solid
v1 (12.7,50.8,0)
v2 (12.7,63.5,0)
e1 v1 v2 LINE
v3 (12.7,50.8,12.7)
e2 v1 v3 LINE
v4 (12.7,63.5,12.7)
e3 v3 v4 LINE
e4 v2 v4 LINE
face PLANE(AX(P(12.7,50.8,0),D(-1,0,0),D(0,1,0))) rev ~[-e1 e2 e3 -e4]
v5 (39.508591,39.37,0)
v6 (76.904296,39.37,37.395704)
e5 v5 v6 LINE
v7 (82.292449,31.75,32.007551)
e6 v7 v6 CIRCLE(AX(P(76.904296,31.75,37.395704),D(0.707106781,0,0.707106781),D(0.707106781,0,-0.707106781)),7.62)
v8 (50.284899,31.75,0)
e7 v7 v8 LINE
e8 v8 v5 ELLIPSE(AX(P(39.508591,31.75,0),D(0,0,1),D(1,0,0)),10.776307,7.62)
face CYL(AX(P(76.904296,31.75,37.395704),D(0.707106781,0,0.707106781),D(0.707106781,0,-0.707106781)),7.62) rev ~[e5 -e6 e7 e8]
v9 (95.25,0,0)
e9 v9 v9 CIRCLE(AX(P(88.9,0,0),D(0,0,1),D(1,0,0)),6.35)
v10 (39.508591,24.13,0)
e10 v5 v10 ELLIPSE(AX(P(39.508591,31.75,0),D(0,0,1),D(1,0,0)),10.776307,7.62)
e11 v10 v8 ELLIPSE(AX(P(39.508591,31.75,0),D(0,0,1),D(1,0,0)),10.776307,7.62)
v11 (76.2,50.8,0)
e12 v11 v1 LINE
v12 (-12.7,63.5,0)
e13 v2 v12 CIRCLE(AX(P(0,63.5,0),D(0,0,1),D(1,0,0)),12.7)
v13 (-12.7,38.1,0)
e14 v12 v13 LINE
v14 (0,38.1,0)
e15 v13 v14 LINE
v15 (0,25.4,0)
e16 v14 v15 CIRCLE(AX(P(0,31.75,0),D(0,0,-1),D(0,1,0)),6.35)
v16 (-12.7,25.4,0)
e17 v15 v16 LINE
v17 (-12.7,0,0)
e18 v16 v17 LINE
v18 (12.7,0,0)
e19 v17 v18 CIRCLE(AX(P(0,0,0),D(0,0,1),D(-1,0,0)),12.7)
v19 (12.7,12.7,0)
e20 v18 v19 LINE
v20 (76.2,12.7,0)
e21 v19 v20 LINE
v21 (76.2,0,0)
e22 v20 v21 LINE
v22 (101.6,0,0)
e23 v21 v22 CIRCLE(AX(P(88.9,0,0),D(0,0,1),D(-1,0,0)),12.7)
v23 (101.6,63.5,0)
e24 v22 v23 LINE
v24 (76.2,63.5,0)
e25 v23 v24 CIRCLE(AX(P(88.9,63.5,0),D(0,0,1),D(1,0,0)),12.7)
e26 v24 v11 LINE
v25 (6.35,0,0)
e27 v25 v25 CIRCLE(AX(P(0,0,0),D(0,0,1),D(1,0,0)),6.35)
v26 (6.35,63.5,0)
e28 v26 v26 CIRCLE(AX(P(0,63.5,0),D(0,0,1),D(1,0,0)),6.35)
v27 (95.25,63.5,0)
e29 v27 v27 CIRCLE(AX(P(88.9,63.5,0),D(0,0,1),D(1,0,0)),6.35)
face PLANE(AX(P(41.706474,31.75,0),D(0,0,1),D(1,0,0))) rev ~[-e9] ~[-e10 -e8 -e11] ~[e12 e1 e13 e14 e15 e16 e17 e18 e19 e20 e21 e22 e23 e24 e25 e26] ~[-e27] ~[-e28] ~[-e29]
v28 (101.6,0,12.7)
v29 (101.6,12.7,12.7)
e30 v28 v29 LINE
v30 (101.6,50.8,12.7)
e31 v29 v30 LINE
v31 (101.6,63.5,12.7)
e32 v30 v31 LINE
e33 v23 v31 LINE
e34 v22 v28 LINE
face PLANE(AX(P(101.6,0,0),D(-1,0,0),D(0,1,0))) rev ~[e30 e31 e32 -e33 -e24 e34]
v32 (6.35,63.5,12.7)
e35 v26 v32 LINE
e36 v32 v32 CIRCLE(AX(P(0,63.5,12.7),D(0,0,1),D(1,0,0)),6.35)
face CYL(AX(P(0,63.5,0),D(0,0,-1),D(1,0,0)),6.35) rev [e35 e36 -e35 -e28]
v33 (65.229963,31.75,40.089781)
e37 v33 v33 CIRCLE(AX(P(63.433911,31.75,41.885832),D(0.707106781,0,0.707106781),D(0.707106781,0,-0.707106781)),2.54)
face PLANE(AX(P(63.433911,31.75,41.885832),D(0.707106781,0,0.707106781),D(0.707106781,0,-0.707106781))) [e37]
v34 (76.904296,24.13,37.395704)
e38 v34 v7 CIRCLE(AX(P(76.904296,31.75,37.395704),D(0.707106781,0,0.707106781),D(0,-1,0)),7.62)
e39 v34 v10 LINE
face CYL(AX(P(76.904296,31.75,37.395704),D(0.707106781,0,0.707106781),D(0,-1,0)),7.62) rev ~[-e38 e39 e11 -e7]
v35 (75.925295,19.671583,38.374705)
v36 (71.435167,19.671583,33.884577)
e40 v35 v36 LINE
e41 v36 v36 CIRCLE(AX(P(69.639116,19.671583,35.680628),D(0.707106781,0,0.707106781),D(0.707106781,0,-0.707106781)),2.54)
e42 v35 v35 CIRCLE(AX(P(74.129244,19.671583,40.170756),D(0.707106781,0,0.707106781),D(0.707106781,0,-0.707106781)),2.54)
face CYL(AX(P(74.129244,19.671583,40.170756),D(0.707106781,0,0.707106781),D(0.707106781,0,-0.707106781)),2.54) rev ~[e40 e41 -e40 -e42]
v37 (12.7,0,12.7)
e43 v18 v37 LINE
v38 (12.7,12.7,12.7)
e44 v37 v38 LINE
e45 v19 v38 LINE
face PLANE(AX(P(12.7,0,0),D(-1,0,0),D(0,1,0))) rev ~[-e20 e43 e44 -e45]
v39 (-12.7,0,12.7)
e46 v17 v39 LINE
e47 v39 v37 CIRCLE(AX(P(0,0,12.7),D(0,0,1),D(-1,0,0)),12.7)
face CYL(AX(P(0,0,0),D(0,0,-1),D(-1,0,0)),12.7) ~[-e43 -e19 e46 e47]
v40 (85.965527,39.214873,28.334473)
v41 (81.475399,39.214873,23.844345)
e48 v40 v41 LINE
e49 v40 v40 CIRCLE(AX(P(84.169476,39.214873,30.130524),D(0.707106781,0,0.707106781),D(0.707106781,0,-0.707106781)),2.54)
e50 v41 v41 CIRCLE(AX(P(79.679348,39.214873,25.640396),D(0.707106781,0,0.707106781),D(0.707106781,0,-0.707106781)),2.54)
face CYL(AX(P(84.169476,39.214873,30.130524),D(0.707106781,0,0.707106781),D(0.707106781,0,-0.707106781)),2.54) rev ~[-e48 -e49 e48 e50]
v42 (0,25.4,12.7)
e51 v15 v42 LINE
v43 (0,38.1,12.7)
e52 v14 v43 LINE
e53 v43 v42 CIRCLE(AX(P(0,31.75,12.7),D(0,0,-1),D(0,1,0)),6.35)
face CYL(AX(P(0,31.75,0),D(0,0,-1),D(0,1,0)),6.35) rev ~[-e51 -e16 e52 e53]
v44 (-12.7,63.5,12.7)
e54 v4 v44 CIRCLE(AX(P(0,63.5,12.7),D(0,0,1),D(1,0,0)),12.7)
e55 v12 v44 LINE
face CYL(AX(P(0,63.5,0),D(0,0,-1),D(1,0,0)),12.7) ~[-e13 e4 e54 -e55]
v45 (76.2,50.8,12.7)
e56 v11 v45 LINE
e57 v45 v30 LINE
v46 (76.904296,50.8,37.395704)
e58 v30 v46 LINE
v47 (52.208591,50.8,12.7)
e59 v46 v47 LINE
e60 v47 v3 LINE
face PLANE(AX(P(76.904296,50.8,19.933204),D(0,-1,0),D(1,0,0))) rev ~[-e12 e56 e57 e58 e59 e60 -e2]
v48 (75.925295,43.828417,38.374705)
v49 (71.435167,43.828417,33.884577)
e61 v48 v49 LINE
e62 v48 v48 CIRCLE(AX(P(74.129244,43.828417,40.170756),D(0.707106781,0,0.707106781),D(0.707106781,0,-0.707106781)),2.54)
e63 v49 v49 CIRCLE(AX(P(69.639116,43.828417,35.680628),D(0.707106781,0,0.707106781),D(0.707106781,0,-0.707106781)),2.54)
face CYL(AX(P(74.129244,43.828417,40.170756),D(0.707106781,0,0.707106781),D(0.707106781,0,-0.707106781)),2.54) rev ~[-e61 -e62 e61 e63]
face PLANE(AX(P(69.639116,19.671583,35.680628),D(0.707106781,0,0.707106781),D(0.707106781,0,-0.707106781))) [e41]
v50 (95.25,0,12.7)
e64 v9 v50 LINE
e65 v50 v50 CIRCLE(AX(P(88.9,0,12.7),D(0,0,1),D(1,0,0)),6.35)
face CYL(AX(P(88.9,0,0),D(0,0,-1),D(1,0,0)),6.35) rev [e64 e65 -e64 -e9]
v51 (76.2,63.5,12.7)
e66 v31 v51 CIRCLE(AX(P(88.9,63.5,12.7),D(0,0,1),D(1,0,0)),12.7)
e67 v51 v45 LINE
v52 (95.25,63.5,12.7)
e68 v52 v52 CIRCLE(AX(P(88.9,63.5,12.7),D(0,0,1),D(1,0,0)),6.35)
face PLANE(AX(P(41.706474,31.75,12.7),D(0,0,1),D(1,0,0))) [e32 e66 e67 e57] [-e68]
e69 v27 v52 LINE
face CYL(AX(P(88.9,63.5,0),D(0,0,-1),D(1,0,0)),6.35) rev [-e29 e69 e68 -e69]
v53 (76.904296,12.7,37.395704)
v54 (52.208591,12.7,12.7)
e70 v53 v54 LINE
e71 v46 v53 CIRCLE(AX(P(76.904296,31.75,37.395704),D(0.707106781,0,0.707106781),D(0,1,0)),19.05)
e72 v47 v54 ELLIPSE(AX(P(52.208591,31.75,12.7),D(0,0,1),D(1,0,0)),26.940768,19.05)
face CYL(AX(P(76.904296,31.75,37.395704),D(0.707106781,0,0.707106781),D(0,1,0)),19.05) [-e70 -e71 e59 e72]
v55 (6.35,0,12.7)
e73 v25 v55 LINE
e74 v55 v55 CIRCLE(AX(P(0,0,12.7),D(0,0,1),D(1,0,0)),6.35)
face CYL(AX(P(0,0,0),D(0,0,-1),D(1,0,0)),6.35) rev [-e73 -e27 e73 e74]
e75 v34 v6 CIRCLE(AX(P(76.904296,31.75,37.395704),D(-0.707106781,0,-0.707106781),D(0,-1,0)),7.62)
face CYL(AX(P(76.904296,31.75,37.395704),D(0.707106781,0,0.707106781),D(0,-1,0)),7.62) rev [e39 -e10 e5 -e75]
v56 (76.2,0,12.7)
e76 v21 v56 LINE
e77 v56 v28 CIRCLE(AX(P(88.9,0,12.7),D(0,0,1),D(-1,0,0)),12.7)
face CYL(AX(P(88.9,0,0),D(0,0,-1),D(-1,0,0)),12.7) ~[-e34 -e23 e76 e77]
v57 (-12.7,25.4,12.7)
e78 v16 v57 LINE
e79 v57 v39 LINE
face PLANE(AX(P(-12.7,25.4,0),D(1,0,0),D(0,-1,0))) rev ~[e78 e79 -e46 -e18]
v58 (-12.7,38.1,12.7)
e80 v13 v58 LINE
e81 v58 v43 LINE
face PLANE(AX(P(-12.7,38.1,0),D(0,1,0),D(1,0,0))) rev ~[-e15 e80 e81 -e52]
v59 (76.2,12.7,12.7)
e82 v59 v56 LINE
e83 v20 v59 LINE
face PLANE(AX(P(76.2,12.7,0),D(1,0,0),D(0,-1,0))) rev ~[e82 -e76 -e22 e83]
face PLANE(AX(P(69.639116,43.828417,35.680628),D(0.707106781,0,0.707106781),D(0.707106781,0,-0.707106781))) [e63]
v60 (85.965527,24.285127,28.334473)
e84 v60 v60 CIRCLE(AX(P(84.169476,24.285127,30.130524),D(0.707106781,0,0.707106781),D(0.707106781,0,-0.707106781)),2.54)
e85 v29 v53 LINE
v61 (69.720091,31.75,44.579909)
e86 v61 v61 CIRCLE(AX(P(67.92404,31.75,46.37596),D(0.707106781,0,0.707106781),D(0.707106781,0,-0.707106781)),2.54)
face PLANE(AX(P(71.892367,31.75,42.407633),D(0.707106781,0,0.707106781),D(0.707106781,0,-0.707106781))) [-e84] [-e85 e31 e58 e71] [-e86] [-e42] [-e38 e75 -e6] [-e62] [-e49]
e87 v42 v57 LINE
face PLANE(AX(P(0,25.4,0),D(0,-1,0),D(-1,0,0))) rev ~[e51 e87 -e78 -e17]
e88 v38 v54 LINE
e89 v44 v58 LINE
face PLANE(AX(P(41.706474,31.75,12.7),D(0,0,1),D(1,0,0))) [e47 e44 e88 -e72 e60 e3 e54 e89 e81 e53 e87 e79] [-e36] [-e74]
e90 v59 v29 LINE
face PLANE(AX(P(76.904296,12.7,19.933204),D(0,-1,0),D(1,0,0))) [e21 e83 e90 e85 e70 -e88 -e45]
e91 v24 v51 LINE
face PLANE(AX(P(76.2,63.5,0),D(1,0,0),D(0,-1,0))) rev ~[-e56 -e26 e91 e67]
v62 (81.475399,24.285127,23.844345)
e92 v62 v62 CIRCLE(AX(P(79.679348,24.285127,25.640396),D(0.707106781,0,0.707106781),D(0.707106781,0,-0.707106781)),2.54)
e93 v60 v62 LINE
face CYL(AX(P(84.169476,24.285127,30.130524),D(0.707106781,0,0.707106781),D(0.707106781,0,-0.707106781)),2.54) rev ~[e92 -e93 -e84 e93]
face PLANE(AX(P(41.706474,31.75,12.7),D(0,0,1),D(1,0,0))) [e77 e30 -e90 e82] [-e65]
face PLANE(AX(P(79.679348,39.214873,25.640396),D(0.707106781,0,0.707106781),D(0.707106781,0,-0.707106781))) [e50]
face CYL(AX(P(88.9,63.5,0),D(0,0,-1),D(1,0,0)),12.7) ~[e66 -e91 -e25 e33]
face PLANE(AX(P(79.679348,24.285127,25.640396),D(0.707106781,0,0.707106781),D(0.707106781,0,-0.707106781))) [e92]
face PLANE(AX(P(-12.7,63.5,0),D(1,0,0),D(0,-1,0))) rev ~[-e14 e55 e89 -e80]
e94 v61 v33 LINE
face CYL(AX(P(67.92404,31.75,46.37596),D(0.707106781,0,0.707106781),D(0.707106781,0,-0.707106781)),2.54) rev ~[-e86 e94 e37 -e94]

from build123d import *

# Parameters (mm, degrees)
F0_R             = 6.35
F1_DEPTH         = 12.7
F3_DEPTH         = 38.1
F7_DEPTH         = 89.8035612107
F8_R             = 2.54
F9_DEPTH         = 6.35
F9_COPIES_COUNT  = 2
F9_COPIES_PITCH  = 14.929745
F9_COPIES1_COUNT = 2
F9_COPIES1_PITCH = 14.929745
F9_COPIES2_COUNT = 2
F9_COPIES2_PITCH = 24.156836
F9_COPIES3_COUNT = 2
F9_COPIES3_PITCH = 24.156836


# Not quite as in the source:
# - a pattern or mirror of a feature is missing from the dataset's text; its kind, count and spacing are read off the source's solid


with BuildPart() as f1:
    # F0 (on Top) → F1 (new body)
    with BuildSketch(Plane.XY):
        with BuildLine():
            Line((12.7, 50.8), (12.7, 63.5))
            ThreePointArc((12.7, 63.5), (0, 76.2), (-12.7, 63.5))
            Line((-12.7, 63.5), (-12.7, 38.1))
            Line((-12.7, 38.1), (0, 38.1))
            ThreePointArc((0, 38.1), (6.35, 31.75), (0, 25.4))
            Line((0, 25.4), (-12.7, 25.4))
            Line((-12.7, 25.4), (-12.7, 0))
            ThreePointArc((-12.7, 0), (0, -12.7), (12.7, 0))
            Line((12.7, 0), (12.7, 12.7))
            Line((12.7, 12.7), (76.2, 12.7))
            Line((76.2, 12.7), (76.2, 0))
            ThreePointArc((76.2, 0), (88.9, -12.7), (101.6, 0))
            Line((101.6, 0), (101.6, 63.5))
            ThreePointArc((101.6, 63.5), (88.9, 76.2), (76.2, 63.5))
            Line((76.2, 63.5), (76.2, 50.8))
            Line((76.2, 50.8), (12.7, 50.8))
        make_face()
        Circle(F0_R, mode=Mode.SUBTRACT)
        with Locations((88.9, 0)):
            Circle(F0_R, mode=Mode.SUBTRACT)
        with Locations((0, 63.5)):
            Circle(F0_R, mode=Mode.SUBTRACT)
        with Locations((88.9, 63.5)):
            Circle(F0_R, mode=Mode.SUBTRACT)
    extrude(amount=F1_DEPTH)

    # F2 (on face) → F3 (join)
    with BuildSketch(Plane.XZ.offset(-12.7)):
        Polygon((76.2, 12.7), (101.6, 12.7), (76.9042956671, 37.3957043329), (52.2085913341, 12.7), align=None)
    extrude(amount=-F3_DEPTH)

    # F4 (on face) → F5 (join, up to the next surface of F1)
    with BuildSketch(Plane(origin=(57.15, 0, 57.15), x_dir=(0.7071067812, 0, -0.7071067812), z_dir=(0.7071067812, 0, 0.7071067812))):
        with BuildLine():
            ThreePointArc((27.9367928475, 24.13), (20.3167928475, 31.75), (27.9367928475, 39.37))
            Line((27.9367928475, 39.37), (27.9367928475, 50.8))
            ThreePointArc((27.9367928475, 50.8), (8.8867928475, 31.75), (27.9367928475, 12.7))
            Line((27.9367928475, 12.7), (27.9367928475, 24.13))
        make_face()
    extrude(until=Until.NEXT, dir=(-0.7071067812, 0, -0.7071067812))

    # F6 (on face) → F7 (cut, through all)
    with BuildSketch(Plane(origin=(57.15, 0, 57.15), x_dir=(0.7071067812, 0, -0.7071067812), z_dir=(0.7071067812, 0, 0.7071067812))):
        with BuildLine():
            ThreePointArc((27.9367928475, 24.13), (33.3249465201, 26.3618463274), (35.5567928475, 31.75))
            ThreePointArc((35.5567928475, 31.75), (33.3249465201, 37.1381536726), (27.9367928475, 39.37))
            Line((27.9367928475, 39.37), (27.9367928475, 24.13))
        make_face()
        with BuildLine():
            Line((27.9367928475, 24.13), (27.9367928475, 39.37))
            ThreePointArc((27.9367928475, 39.37), (20.3167928475, 31.75), (27.9367928475, 24.13))
        make_face()
    extrude(amount=-F7_DEPTH, mode=Mode.SUBTRACT)

    # F8 (on face) → F9 (cut)
    with BuildSketch(Plane(origin=(57.15, 0, 57.15), x_dir=(0.7071067812, 0, -0.7071067812), z_dir=(0.7071067812, 0, 0.7071067812))):
        with Locations((15.2367928475, 31.75)):
            Circle(F8_R)
    f9 = extrude(amount=-F9_DEPTH, mode=Mode.SUBTRACT)

    # F9_copies: F9 ×2
    with Locations(*[Vector(0.4156269378, 0.8090169944, -0.4156269378) * (i * F9_COPIES_PITCH) for i in range(1, F9_COPIES_COUNT)]):
        add(f9, mode=Mode.SUBTRACT)

    # F9_copies1: F9 ×2
    with Locations(*[Vector(0.4156269378, -0.8090169944, -0.4156269378) * (i * F9_COPIES1_PITCH) for i in range(1, F9_COPIES1_COUNT)]):
        add(f9, mode=Mode.SUBTRACT)

    # F9_copies2: F9 ×2
    with Locations(*[Vector(0.672498512, -0.3090169944, -0.672498512) * (i * F9_COPIES2_PITCH) for i in range(1, F9_COPIES2_COUNT)]):
        add(f9, mode=Mode.SUBTRACT)

    # F9_copies3: F9 ×2
    with Locations(*[Vector(0.672498512, 0.3090169944, -0.672498512) * (i * F9_COPIES3_PITCH) for i in range(1, F9_COPIES3_COUNT)]):
        add(f9, mode=Mode.SUBTRACT)


solid = f1.part
